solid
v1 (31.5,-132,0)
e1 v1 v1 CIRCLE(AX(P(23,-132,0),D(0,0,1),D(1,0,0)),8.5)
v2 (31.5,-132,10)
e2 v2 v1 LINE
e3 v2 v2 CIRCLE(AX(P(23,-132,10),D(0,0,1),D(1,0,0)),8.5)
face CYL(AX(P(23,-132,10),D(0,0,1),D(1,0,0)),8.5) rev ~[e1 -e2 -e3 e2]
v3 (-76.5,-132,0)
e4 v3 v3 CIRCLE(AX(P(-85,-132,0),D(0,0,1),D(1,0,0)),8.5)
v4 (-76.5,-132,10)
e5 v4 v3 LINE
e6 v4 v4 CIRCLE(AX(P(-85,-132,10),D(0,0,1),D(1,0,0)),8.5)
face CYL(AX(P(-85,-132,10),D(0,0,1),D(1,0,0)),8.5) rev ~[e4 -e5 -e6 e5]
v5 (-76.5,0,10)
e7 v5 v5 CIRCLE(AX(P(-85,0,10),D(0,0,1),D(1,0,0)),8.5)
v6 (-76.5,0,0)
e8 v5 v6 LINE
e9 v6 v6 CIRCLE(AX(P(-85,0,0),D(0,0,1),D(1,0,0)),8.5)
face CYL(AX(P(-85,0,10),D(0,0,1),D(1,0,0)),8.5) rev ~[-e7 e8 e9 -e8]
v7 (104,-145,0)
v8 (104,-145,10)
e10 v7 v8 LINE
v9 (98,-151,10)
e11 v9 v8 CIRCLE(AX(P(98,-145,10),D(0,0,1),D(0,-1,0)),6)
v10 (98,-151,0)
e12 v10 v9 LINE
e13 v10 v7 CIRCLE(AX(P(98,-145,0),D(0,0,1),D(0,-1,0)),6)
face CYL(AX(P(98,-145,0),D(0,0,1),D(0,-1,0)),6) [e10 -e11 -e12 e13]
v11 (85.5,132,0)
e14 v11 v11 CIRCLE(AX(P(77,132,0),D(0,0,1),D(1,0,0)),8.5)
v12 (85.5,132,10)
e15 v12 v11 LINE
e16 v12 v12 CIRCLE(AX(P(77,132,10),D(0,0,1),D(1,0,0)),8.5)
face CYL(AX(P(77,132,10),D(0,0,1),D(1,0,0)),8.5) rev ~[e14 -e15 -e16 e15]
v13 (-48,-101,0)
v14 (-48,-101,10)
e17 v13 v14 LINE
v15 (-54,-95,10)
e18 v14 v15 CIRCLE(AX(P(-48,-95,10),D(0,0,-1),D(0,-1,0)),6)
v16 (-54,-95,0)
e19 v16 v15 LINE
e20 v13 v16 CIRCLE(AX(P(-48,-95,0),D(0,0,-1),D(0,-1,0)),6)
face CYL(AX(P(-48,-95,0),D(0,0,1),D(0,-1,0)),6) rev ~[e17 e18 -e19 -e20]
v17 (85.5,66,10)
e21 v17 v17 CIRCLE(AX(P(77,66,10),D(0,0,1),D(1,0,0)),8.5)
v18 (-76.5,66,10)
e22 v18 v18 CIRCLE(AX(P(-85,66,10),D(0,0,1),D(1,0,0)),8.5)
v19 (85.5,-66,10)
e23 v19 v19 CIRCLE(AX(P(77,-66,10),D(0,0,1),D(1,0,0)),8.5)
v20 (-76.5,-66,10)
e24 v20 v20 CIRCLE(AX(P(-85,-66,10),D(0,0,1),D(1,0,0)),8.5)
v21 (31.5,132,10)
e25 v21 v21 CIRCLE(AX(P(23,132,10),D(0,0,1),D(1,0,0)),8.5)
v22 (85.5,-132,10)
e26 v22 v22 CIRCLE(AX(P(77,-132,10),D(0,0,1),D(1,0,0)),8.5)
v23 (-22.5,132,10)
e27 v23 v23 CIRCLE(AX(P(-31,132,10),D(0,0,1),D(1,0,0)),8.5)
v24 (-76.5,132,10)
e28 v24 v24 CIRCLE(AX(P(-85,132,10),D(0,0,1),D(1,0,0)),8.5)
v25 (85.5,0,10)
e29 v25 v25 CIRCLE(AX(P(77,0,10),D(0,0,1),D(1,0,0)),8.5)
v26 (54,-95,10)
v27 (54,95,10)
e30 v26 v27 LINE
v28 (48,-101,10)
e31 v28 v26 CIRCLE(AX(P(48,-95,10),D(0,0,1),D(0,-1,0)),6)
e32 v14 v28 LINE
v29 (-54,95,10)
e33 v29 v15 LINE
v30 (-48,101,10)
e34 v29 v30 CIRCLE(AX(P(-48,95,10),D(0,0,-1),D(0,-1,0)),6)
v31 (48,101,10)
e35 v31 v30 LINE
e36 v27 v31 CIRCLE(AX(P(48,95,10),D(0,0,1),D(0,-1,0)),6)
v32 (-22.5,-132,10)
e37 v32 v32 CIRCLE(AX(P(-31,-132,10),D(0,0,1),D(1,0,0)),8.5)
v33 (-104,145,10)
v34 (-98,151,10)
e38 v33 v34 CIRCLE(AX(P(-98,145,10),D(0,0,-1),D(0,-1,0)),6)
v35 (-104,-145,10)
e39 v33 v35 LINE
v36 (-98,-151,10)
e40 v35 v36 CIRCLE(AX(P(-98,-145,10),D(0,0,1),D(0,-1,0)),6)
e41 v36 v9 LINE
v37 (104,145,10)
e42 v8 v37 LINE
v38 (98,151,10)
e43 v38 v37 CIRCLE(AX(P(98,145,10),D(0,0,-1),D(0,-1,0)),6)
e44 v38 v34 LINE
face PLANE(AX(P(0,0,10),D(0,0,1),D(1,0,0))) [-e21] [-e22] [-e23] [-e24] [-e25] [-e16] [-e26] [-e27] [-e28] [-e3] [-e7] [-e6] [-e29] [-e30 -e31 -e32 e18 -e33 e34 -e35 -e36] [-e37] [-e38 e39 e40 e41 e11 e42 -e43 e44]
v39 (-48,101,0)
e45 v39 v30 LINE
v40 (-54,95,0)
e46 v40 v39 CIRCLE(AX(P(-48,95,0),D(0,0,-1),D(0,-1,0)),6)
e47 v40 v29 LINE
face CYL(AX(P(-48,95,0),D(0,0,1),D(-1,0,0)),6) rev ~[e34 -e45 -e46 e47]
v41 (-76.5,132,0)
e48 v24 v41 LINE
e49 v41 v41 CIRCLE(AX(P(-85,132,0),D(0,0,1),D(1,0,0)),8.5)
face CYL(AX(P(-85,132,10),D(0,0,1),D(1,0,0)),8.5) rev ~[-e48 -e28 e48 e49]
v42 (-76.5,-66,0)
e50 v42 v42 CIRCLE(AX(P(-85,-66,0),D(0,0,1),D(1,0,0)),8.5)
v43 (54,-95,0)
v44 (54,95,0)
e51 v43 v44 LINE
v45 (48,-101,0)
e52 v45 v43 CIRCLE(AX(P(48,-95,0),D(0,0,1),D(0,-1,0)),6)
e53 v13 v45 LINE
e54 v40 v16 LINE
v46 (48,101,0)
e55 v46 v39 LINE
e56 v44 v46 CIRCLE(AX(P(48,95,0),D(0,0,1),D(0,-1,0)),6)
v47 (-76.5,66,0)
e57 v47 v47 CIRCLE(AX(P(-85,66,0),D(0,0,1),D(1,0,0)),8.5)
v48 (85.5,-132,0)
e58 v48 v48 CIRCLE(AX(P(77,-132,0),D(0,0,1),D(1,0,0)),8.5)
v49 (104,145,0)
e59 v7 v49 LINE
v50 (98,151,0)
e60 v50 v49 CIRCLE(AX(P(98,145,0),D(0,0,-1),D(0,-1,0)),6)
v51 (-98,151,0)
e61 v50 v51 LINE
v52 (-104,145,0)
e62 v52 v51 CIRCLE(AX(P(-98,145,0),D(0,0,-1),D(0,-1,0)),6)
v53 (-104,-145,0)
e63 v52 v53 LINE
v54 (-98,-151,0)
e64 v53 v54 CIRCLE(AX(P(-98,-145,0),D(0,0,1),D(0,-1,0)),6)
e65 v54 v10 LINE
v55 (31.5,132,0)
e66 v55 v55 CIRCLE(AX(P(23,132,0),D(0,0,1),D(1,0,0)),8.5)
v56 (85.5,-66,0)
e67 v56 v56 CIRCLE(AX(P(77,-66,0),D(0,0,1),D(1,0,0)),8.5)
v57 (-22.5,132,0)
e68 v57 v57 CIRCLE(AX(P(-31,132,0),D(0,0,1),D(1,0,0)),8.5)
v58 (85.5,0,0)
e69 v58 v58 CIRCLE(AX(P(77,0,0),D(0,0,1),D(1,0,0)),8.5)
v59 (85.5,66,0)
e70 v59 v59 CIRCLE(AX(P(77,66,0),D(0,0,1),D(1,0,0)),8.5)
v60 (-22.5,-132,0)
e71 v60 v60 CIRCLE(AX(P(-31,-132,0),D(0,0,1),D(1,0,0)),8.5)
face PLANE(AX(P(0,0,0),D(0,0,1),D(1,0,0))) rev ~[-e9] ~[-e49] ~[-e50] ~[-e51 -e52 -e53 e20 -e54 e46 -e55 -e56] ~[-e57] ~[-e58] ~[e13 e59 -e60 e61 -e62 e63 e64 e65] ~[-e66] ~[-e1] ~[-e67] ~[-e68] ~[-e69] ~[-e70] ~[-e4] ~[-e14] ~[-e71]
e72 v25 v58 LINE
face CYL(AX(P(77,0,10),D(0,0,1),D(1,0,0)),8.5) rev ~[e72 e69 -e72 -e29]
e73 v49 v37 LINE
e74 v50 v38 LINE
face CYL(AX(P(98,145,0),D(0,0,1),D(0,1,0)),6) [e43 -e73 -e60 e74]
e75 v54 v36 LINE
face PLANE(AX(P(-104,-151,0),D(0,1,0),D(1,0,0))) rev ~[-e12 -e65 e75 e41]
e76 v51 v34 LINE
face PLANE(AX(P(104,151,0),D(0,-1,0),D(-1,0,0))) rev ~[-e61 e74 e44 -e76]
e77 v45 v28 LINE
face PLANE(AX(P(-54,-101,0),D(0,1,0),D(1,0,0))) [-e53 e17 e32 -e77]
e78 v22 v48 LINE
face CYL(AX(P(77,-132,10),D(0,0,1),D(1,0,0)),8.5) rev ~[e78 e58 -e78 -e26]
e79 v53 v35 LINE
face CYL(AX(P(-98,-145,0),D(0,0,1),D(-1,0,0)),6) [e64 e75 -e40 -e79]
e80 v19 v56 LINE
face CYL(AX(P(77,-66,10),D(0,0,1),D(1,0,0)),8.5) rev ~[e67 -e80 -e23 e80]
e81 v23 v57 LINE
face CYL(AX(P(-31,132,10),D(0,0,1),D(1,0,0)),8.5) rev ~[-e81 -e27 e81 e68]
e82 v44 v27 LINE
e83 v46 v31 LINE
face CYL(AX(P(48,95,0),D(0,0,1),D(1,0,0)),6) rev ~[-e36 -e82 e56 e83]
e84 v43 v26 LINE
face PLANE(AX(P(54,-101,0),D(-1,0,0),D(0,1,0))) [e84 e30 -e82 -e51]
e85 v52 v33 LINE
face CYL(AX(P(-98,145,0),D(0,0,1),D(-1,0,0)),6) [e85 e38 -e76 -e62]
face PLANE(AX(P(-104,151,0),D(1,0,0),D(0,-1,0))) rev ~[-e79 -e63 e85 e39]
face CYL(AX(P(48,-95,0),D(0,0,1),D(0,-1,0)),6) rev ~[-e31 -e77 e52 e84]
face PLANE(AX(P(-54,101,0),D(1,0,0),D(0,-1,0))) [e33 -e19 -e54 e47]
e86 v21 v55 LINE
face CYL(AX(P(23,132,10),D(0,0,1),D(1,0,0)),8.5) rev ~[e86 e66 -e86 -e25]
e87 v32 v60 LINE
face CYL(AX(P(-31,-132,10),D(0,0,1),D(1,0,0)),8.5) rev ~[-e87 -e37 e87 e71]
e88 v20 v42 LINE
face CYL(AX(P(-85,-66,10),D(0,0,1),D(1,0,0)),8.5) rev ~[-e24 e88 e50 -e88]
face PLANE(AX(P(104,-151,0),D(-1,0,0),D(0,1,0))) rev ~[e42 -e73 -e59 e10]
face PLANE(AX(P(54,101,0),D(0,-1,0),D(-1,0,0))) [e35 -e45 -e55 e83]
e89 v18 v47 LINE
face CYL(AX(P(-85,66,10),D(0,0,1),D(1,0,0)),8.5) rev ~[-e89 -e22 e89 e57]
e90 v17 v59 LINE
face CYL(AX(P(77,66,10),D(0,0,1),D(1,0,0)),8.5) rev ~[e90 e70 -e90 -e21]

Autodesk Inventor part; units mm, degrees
ref_plane "YZ Plane" through (0, 0, 0) normal (1, 0, 0) x (0, 1, 0)
ref_plane "XZ Plane" through (0, 0, 0) normal (0, 1, 0) x (-1, 0, 0)
ref_plane "XY Plane" through (0, 0, 0) normal (0, 0, 1) x (1, 0, 0)
sketch "Sketch2" plane through (0, 0, 0) normal (0, 0, 1) x (1, 0, 0)
  line L0 (-54, -101) -> (54, -101)
  line L1 (54, -101) -> (54, 101)
  line L2 (54, 101) -> (-54, 101)
  line L3 (-54, 101) -> (-54, -101)
  line L4 (-54, -101) -> (54, 101) construction
  line L5 (54, -101) -> (-54, 101) construction
  line L6 (-104, -151) -> (104, -151)
  line L7 (104, -151) -> (104, 151)
  line L8 (104, 151) -> (-104, 151)
  line L9 (-104, 151) -> (-104, -151)
  point P0 (0, 0)
  dimension "d29" = 108
  dimension "d30" = 202
  dimension "d31" = 50
  dimension "d47" = 208
  dimension "d48" = 302
extrude "Plate2" add sketch "Sketch2" along normal blind 10
sketch "Sketch5" plane through (0, 0, 10) normal (0, 0, 1) x (1, 0, 0)
  line L0 (54, 101) -> (54, -101) construction
  line L1 (54, -101) -> (-54, -101) construction
  line L2 (-54, -101) -> (-54, 101) construction
  line L3 (-54, 101) -> (54, 101) construction
  line L4 (104, -151) -> (-104, -151) construction
  line L5 (104, 151) -> (104, -151) construction
  line L6 (-104, 151) -> (104, 151) construction
  line L7 (-104, -151) -> (-104, 151) construction
  line L8 (-85, 132) -> (85, 132) construction
  line L9 (85, 132) -> (85, -132) construction
  line L10 (85, -132) -> (-85, -132) construction
  line L11 (-85, -132) -> (-85, 132) construction
  circle A0 centre (-85, -132) radius 8.5
  circle A1 centre (-85, 132) radius 8.5
  circle A2 centre (-85, 0) radius 8.5
  circle A3 centre (-85, -66) radius 8.5
  circle A4 centre (-85, 66) radius 8.5
  line L12 (-54, 0) -> (54, 0) construction
  circle A5 centre (-31, -132) radius 8.5
  circle A6 centre (-31, -66) radius 8.5
  circle A7 centre (-31, 0) radius 8.5
  circle A8 centre (-31, 66) radius 8.5
  circle A9 centre (-31, 132) radius 8.5
  circle A10 centre (23, -132) radius 8.5
  circle A11 centre (23, -66) radius 8.5
  circle A12 centre (23, 0) radius 8.5
  circle A13 centre (23, 66) radius 8.5
  circle A14 centre (23, 132) radius 8.5
  circle A15 centre (77, -132) radius 8.5
  circle A16 centre (77, -66) radius 8.5
  circle A17 centre (77, 0) radius 8.5
  circle A18 centre (77, 66) radius 8.5
  circle A19 centre (77, 132) radius 8.5
  point P0 (0, 0)
  point P1 (0, -132)
  dimension "d33" = 17
  dimension "d34" = 19
  dimension "d35" = 66
  dimension "d36" = 66
  dimension "d39" = 54
extrude "Cut3" cut sketch "Sketch5" against normal blind 10
fillet "Corner Round1" radius 6 8 edges at (-104, -151, 5) (-104, 151, 5) (104, 151, 5) (104, -151, 5) (54, -101, 5) (-54, -101, 5) (-54, 101, 5) (54, 101, 5)
equation "\"d35\" = d36"
equation "\"d44\" = Thickness"
equation "\"d14\" = Thickness"
equation "\"BendReliefDepth\" = 0.5 * Thickness"
equation "\"TransitionRadius\" = BendRadius"
equation "\"JacobiRadiusSize\" = BendRadius"
equation "\"Thickness\" = 10"
equation "\"BendRadius\" = 6"
properties part number "PRS 940-06 charging flange round" material "Steel"
